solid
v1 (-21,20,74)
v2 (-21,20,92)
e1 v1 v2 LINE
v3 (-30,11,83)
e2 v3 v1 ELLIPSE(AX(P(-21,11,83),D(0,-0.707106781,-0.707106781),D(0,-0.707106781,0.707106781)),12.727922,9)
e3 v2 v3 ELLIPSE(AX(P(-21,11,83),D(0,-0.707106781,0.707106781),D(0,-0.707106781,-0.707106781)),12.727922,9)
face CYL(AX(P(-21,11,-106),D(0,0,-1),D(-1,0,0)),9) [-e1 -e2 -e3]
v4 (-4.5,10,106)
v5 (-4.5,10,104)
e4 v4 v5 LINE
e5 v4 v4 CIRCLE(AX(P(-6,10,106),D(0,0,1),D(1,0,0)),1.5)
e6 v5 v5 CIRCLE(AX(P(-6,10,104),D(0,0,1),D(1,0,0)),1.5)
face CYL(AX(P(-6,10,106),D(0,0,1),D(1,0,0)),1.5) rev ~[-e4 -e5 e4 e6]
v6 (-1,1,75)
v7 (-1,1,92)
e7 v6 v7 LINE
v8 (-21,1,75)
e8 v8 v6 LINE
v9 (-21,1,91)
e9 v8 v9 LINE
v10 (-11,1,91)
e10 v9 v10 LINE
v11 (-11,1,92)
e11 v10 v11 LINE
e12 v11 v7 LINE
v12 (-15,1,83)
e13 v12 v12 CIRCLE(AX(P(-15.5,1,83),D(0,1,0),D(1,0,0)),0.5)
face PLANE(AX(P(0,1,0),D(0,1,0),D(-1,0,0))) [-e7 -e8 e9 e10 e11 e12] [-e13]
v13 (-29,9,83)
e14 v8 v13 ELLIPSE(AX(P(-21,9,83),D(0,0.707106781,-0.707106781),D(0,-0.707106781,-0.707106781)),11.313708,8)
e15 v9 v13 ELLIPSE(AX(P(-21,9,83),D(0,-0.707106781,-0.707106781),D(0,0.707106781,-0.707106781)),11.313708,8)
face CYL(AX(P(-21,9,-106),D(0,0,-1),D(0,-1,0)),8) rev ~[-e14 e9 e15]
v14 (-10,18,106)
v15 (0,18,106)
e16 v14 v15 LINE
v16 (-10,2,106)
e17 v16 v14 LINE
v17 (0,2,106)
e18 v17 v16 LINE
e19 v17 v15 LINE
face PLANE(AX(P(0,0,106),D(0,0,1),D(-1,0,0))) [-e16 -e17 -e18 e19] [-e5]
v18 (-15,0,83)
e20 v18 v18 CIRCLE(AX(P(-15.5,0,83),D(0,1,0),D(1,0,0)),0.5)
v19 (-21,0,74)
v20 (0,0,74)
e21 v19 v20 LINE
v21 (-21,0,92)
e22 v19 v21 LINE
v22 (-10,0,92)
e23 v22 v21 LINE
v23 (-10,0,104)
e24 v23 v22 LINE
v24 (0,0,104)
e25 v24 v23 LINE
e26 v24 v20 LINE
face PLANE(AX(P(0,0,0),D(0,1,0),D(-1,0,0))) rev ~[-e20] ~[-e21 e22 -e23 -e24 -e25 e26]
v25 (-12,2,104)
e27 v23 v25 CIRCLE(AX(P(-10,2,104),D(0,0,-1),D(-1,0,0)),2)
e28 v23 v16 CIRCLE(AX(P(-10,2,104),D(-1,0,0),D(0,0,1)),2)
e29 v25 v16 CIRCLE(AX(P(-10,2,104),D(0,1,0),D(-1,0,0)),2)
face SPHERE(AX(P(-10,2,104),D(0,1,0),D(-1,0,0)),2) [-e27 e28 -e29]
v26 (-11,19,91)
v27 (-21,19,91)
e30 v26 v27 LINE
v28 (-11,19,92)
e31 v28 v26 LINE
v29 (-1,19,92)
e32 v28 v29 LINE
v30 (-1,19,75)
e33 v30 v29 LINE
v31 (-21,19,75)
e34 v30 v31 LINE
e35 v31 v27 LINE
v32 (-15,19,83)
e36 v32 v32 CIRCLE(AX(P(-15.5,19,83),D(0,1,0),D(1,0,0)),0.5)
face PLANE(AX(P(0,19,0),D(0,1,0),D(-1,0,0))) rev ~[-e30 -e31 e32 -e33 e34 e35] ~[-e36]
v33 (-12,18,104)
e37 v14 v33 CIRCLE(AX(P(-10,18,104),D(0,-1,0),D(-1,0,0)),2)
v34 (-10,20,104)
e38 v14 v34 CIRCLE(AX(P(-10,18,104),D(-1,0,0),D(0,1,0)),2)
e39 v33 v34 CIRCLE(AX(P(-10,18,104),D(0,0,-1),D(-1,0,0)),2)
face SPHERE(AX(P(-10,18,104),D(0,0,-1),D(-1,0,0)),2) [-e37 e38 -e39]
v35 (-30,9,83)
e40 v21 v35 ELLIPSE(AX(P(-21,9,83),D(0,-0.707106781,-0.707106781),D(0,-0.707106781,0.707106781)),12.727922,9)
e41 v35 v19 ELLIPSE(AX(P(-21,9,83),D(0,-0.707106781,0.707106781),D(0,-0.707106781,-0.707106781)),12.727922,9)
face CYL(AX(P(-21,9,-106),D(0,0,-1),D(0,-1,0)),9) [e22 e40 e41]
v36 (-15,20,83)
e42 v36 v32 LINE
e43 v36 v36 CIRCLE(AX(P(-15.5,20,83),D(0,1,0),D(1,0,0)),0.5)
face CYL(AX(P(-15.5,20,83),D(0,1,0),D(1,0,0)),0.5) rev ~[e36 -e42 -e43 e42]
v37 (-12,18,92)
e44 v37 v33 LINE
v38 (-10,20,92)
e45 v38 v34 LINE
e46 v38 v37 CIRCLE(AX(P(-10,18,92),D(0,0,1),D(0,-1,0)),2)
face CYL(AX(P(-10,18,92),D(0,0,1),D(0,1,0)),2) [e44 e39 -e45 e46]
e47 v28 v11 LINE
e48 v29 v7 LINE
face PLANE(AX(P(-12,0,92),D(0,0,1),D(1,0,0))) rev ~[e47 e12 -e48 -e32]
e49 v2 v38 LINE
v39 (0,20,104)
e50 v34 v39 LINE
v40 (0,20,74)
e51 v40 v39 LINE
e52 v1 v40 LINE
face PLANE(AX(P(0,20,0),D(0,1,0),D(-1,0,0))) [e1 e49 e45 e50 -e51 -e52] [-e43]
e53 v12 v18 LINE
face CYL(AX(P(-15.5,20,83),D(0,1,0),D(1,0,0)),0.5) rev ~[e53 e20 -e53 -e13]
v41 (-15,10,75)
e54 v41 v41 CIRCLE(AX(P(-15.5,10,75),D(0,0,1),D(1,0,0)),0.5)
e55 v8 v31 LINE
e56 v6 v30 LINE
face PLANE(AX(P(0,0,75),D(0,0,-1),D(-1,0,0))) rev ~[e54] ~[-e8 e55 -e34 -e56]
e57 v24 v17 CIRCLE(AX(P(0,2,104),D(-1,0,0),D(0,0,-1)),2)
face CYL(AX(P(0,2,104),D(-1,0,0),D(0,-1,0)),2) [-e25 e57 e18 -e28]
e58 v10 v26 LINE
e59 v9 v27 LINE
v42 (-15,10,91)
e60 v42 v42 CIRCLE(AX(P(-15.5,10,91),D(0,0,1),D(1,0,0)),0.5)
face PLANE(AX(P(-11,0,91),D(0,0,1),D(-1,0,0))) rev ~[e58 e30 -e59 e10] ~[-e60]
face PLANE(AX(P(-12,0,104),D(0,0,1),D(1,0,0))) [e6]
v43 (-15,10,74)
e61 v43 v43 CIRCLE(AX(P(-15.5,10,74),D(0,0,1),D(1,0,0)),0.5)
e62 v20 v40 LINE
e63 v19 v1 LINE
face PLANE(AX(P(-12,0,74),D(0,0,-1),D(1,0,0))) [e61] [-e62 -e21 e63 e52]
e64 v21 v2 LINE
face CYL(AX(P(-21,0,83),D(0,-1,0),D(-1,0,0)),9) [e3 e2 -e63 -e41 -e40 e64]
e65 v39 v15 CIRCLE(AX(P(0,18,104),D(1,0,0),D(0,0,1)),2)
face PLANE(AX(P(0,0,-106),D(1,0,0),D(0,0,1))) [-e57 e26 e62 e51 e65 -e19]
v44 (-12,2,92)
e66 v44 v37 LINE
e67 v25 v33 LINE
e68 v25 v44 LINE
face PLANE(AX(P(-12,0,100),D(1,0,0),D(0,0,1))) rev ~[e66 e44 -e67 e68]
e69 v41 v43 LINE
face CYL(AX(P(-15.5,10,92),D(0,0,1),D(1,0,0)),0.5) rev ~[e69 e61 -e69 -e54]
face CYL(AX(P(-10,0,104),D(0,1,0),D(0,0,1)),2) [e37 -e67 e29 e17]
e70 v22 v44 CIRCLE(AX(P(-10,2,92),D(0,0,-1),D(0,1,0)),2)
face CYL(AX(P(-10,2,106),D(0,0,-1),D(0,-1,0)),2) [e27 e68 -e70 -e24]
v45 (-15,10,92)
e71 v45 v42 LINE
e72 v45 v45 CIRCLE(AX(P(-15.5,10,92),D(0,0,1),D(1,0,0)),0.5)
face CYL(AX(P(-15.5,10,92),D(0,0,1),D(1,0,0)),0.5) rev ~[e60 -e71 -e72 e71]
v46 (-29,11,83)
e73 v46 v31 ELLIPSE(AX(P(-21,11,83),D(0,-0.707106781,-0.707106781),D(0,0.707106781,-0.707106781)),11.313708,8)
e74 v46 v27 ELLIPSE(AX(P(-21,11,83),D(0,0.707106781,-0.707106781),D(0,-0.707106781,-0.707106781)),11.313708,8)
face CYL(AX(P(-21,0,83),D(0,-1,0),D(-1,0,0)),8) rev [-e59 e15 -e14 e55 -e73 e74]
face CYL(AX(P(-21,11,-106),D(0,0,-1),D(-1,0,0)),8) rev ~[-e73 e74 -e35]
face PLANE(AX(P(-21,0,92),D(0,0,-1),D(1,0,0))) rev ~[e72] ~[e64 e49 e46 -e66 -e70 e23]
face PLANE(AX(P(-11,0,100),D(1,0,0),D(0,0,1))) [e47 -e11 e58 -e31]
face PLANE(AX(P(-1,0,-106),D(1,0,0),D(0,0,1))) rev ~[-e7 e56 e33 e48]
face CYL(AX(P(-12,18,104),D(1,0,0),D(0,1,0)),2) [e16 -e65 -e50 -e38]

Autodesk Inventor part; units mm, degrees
ref_plane "YZ Plane" through (0, 0, 0) normal (1, 0, 0) x (0, 1, 0)
sketch "Sketch1" plane through (0, 0, 0) normal (0, 1, 0) x (-1, 0, 0)
  line L0 (0, -106) -> (0, 94)
  line L1 (0, -106) -> (21, -106) construction
  line L2 (30, -97) -> (30, -97) construction
  line L3 (0, -106) -> (12, -106) construction
  line L4 (21, -88) -> (12, -88) construction
  line L5 (12, -88) -> (12, -86)
  line L6 (12, -106) -> (21, -106)
  line L7 (30, -88) -> (21, -88) construction
  line L8 (30, -88) -> (30, -106) construction
  arc A0 (21, -106) -> (30, -97) centre (21, -97) ccw
  arc A1 (30, -97) -> (21, -88) centre (21, -97) ccw
  line L9 (21, -106) -> (30, -106) construction
  line L10 (21, -88) -> (12, -88)
  line L11 (12, -68) -> (12, -66)
  arc A2 (21, -86) -> (30, -77) centre (21, -77) ccw
  arc A3 (30, -77) -> (21, -68) centre (21, -77) ccw
  line L12 (0, -86) -> (21, -86) construction
  line L13 (21, -68) -> (12, -68) construction
  line L14 (21, -68) -> (12, -68)
  line L15 (12, -86) -> (21, -86)
  line L16 (12, -48) -> (12, -46)
  arc A4 (21, -66) -> (30, -57) centre (21, -57) ccw
  arc A5 (30, -57) -> (21, -48) centre (21, -57) ccw
  line L17 (0, -66) -> (21, -66) construction
  line L18 (21, -48) -> (12, -48) construction
  line L19 (21, -48) -> (12, -48)
  line L20 (12, -66) -> (21, -66)
  line L21 (12, -28) -> (12, -26)
  arc A6 (21, -46) -> (30, -37) centre (21, -37) ccw
  arc A7 (30, -37) -> (21, -28) centre (21, -37) ccw
  line L22 (0, -46) -> (21, -46) construction
  line L23 (21, -28) -> (12, -28) construction
  line L24 (21, -28) -> (12, -28)
  line L25 (12, -46) -> (21, -46)
  line L26 (12, -8) -> (12, -6)
  arc A8 (21, -26) -> (30, -17) centre (21, -17) ccw
  arc A9 (30, -17) -> (21, -8) centre (21, -17) ccw
  line L27 (0, -26) -> (21, -26) construction
  line L28 (21, -8) -> (12, -8) construction
  line L29 (21, -8) -> (12, -8)
  line L30 (12, -26) -> (21, -26)
  line L31 (12, 12) -> (12, 14)
  arc A10 (21, -6) -> (30, 3) centre (21, 3) ccw
  arc A11 (30, 3) -> (21, 12) centre (21, 3) ccw
  line L32 (0, -6) -> (21, -6) construction
  line L33 (21, 12) -> (12, 12) construction
  line L34 (21, 12) -> (12, 12)
  line L35 (12, -6) -> (21, -6)
  line L36 (12, 32) -> (12, 34)
  arc A12 (21, 14) -> (30, 23) centre (21, 23) ccw
  arc A13 (30, 23) -> (21, 32) centre (21, 23) ccw
  line L37 (0, 14) -> (21, 14) construction
  line L38 (21, 32) -> (12, 32) construction
  line L39 (21, 32) -> (12, 32)
  line L40 (12, 14) -> (21, 14)
  line L41 (12, 52) -> (12, 54)
  arc A14 (21, 34) -> (30, 43) centre (21, 43) ccw
  arc A15 (30, 43) -> (21, 52) centre (21, 43) ccw
  line L42 (0, 34) -> (21, 34) construction
  line L43 (21, 52) -> (12, 52) construction
  line L44 (21, 52) -> (12, 52)
  line L45 (12, 34) -> (21, 34)
  line L46 (12, 72) -> (12, 74)
  arc A16 (21, 54) -> (30, 63) centre (21, 63) ccw
  arc A17 (30, 63) -> (21, 72) centre (21, 63) ccw
  line L47 (0, 54) -> (21, 54) construction
  line L48 (21, 72) -> (12, 72) construction
  line L49 (21, 72) -> (12, 72)
  line L50 (12, 54) -> (21, 54)
  line L51 (12, 92) -> (12, 94)
  arc A18 (21, 74) -> (30, 83) centre (21, 83) ccw
  arc A19 (30, 83) -> (21, 92) centre (21, 83) ccw
  line L52 (0, 74) -> (21, 74) construction
  line L53 (21, 92) -> (12, 92) construction
  line L54 (21, 92) -> (12, 92)
  line L55 (12, 74) -> (21, 74)
  line L56 (0, 94) -> (0, 106)
  line L57 (0, 106) -> (6, 106)
  line L58 (12, 100) -> (12, 94)
  line L59 (12, -106) -> (0, -106)
  line L60 (12, 100) -> (12, 106)
  line L61 (12, 106) -> (6, 106)
  line L62 (0, -106) -> (64, -106)
  line L63 (64, -106) -> (64, 74)
  line L64 (64, 74) -> (0, 74)
  line L65 (0, 74) -> (0, -106)
  point P0 (0, 0)
  point P1 (30, -86)
  point P2 (30, -68)
  point P3 (30, -66)
  point P4 (30, -48)
  point P5 (30, -46)
  point P6 (30, -28)
  point P7 (30, -26)
  point P8 (30, -8)
  point P9 (30, -6)
  point P10 (30, 12)
  point P11 (30, 14)
  point P12 (30, 32)
  point P13 (30, 34)
  point P14 (30, 52)
  point P15 (30, 54)
  point P16 (30, 72)
  point P17 (30, 74)
  point P18 (30, 92)
  point P19 (30, -97)
  point P20 (21, 74)
  point P21 (0, 74)
  dimension "d0" = 94
  dimension "d1" = 110.1635
  dimension "d2" = 18
  dimension "d3" = 106.6771
  dimension "d4" = 2
  dimension "d5" = 9
  dimension "d6" = 9
  dimension "d11" = 20
  dimension "d16" = 12
  dimension "d17" = 12
  dimension "d60" = 64
extrude "Extrusion1" add sketch "Sketch1" along normal blind 20 contours L0 L64 L46 L49 A17 A16 L50 L41 L44 A15 A14 L45 L36 L39 A13 A12 L40 L31 L34 A11 A10 L35 L26 L29 A9 A8 L30 L21 L24 A7 A6 L25 L16 L19 A5 A4 L20 L11 L14 A3 A2 L15 L5 L10 A1 A0 L6 L59 | L0 L56 L57 L61 L60 L58 L51 L54 A19 A18 L55 L64
sketch "Sketch2" plane through (0, 0, -106) normal (0, 0, -1) x (-1, 0, 0)
  line L0 (30, 20) -> (21, 20) construction
  line L1 (21, 20) -> (0, 20)
  line L2 (0, 20) -> (0, 0)
  line L3 (0, 0) -> (21, 0)
  line L4 (30, 9) -> (30, 11)
  line L5 (30, 20) -> (0, 0) construction
  arc A0 (30, 11) -> (21, 20) centre (21, 11) ccw
  arc A1 (21, 0) -> (30, 9) centre (21, 9) ccw
  line L6 (5.5, -4) -> (24.5, -4)
  line L7 (24.5, -4) -> (24.5, 24)
  line L8 (24.5, 24) -> (5.5, 24)
  line L9 (5.5, 24) -> (5.5, -4)
  line L10 (5.5, -4) -> (24.5, 24) construction
  line L11 (24.5, -4) -> (5.5, 24) construction
  line L12 (24.5, 24) -> (37.5, 24)
  line L13 (37.5, 24) -> (37.5, 0)
  line L14 (37.5, 0) -> (24.5, -4)
  point P0 (0, 0)
  point P1 (30, 0)
  point P2 (15, 10)
  point P3 (5.5, 0)
  point P4 (5.5, 20)
  dimension "d21" = 30
  dimension "d22" = 20
  dimension "d23" = 9
  dimension "d24" = 9
  dimension "d25" = 19
  dimension "d26" = 28
  dimension "d65" = 13
extrude "Extrusion2" cut sketch "Sketch2" against normal blind 200 contours L1 L9 L8 L7 A0 | L7 L12 L13 L14 A1 L4 A0 | L3 A1 L7 L6 L9
shell "Shell2" thickness 1 removed faces 1 at (-8, 6.6667, 106)
sketch "Sketch7" plane through (-12, 0, 106) normal (0, 0, 1) x (1, 0, 0)
  line L0 (0, 20) -> (12, 20) projected
  line L1 (0, 0) -> (12, 0)
  line L2 (12, 0) -> (12, 20)
  line L3 (12, 20) -> (0, 20)
  line L4 (0, 20) -> (0, 0)
  circle A0 centre (6, 10) radius 1.5
  point P0 (12, 0)
  dimension "d46" = 3
  dimension "d66" = 6
  dimension "d67" = 10
extrude "Extrusion5" add sketch "Sketch7" against normal blind 14 contours L0 L2 L1 L4 | A0
fillet "Fillet2" radius 2 5 edges at (-12, 20, 99) (-12, 10, 106) (-12, 0, 99) (-6, 0, 106) (-6, 20, 106)
extrude "Extrusion6" cut sketch "Sketch7" against normal blind 2 contours A0
sketch "Sketch8" plane through (0, 0, 0) normal (1, 0, 0) x (0, 1, 0)
  line L0 (0, -88) -> (20, -88) projected
  line L1 (0, -86) -> (20, -86) projected
  line L2 (0, 9) -> (20, 9)
  line L3 (20, 9) -> (20, 10)
  line L4 (20, 10) -> (0, 10)
  line L5 (0, 10) -> (0, 9)
  line L6 (0, 19) -> (20, 19)
  line L7 (20, 20) -> (0, 20)
  line L8 (20, 19) -> (20, 20)
  line L9 (0, 20) -> (0, 19)
  line L10 (0, 29) -> (20, 29)
  line L11 (20, 30) -> (0, 30)
  line L12 (20, 29) -> (20, 30)
  line L13 (0, 30) -> (0, 29)
  line L14 (0, 39) -> (20, 39)
  line L15 (20, 40) -> (0, 40)
  line L16 (20, 39) -> (20, 40)
  line L17 (0, 40) -> (0, 39)
  line L18 (0, 49) -> (20, 49)
  line L19 (20, 50) -> (0, 50)
  line L20 (20, 49) -> (20, 50)
  line L21 (0, 50) -> (0, 49)
  line L22 (0, 59) -> (20, 59)
  line L23 (20, 60) -> (0, 60)
  line L24 (20, 59) -> (20, 60)
  line L25 (0, 60) -> (0, 59)
  line L26 (0, 69) -> (20, 69)
  line L27 (20, 70) -> (0, 70)
  line L28 (20, 69) -> (20, 70)
  line L29 (0, 70) -> (0, 69)
  line L30 (0, 79) -> (20, 79)
  line L31 (20, 80) -> (0, 80)
  line L32 (20, 79) -> (20, 80)
  line L33 (0, 80) -> (0, 79)
  line L34 (0, 89) -> (20, 89)
  line L35 (20, 90) -> (0, 90)
  line L36 (20, 89) -> (20, 90)
  line L37 (0, 90) -> (0, 89)
  point P0 (0, 0)
  dimension "d51" = 10
extrude "Extrusion7" [suppressed]
ref_plane "Work Plane1" through (-21, 0, 91.5) normal (0, 0, 1) x (1, 0, 0)
sketch "Sketch4" plane through (-21, 0, 91.5) normal (0, 0, 1) x (1, 0, 0)
  line L0 (0, 0) -> (0, 20) projected
  line L1 (0, 0) -> (12, 20) construction
  circle A0 centre (6, 10) radius 2 construction
  line L2 (5, 6.5) -> (1, 6.5)
  line L3 (1, 6.5) -> (1, 13.5)
  line L4 (1, 13.5) -> (5, 13.5)
  line L5 (5, 13.5) -> (5, 6.5)
  line L6 (5, 6.5) -> (1, 13.5) construction
  line L7 (1, 6.5) -> (5, 13.5) construction
  point P0 (21, 0)
  point P1 (3, 10)
  point P2 (1, 10)
  point P3 (5, 8.2679)
  dimension "d31" = 4
  dimension "d58" = 4
  dimension "d59" = 7
extrude "Extrusion3" [suppressed]
extrude "Extrusion8" cut sketch "Sketch1" along normal blind 20 contours L0 L64 L46 L49 A17 A16 L50 L41 L44 A15 A14 L45 L36 L39 A13 A12 L40 L31 L34 A11 A10 L35 L26 L29 A9 A8 L30 L21 L24 A7 A6 L25 L16 L19 A5 A4 L20 L11 L14 A3 A2 L15 L5 L10 A1 A0 L6 L59 | L55 L64 L63 L62 A0 A1 L10 L5 L15 A2 A3 L14 L11 L20 A4 A5 L19 L16 L25 A6 A7 L24 L21 L30 A8 A9 L29 L26 L35 A10 A11 L34 L31 L40 A12 A13 L39 L36 L45 A14 A15 L44 L41 L50 A16 A17 L49 L46
sketch "Sketch9" plane through (0, 0, 74) normal (0, 0, -1) x (-1, 0, 0)
  line L0 (11, 19) -> (1, 19) projected
  line L1 (11, 19) -> (0, 19)
  line L2 (0, 19) -> (0, 0)
  line L3 (0, 0) -> (11, 0)
  line L4 (11, 0) -> (11, 19)
extrude "Extrusion9" add sketch "Sketch9" against normal blind 1
ref_plane "Work Plane2" through (0, 10, 0) normal (0, 1, 0) x (-1, 0, 0)
sketch "Sketch10" plane through (0, 20, 0) normal (0, 1, 0) x (1, 0, 0)
  line L0 (-10, -104) -> (-10, -92) construction
  line L1 (-21, -92) -> (-21, -74) construction
  line L2 (-10, -92) -> (-21, -74) construction
  circle A0 centre (-15.5, -83) radius 0.5
  point P0 (0, 0)
  dimension "d68" = 1
extrude "Extrusion10" cut sketch "Sketch10" against normal through all
sketch "Sketch11" plane through (-21, 0, 92) normal (0, 0, 1) x (1, 0, 0)
  line L0 (0, 0) -> (11, 0) construction
  line L1 (11, 18) -> (11, 20) construction
  line L2 (0, 0) -> (11, 20) construction
  circle A0 centre (5.5, 10) radius 0.5
  point P0 (21, 0)
  dimension "d71" = 1
extrude "Extrusion11" cut sketch "Sketch11" against normal through all
sketch "Sketch6" plane through (0, 10, 0) normal (0, 1, 0) x (-1, 0, 0)
  line L0 (40.7593, 109.726) -> (-19.2407, 109.726)
  line L1 (-19.2407, 109.726) -> (-19.2407, -3.5286)
  line L2 (-19.2407, -3.5286) -> (40.7593, -3.5286)
  line L3 (40.7593, -3.5286) -> (40.7593, 109.726)
  point P0 (0, 0)
  dimension "d36" = 113.2546
  dimension "d37" = 60
properties part number "3D_print_actuator"
